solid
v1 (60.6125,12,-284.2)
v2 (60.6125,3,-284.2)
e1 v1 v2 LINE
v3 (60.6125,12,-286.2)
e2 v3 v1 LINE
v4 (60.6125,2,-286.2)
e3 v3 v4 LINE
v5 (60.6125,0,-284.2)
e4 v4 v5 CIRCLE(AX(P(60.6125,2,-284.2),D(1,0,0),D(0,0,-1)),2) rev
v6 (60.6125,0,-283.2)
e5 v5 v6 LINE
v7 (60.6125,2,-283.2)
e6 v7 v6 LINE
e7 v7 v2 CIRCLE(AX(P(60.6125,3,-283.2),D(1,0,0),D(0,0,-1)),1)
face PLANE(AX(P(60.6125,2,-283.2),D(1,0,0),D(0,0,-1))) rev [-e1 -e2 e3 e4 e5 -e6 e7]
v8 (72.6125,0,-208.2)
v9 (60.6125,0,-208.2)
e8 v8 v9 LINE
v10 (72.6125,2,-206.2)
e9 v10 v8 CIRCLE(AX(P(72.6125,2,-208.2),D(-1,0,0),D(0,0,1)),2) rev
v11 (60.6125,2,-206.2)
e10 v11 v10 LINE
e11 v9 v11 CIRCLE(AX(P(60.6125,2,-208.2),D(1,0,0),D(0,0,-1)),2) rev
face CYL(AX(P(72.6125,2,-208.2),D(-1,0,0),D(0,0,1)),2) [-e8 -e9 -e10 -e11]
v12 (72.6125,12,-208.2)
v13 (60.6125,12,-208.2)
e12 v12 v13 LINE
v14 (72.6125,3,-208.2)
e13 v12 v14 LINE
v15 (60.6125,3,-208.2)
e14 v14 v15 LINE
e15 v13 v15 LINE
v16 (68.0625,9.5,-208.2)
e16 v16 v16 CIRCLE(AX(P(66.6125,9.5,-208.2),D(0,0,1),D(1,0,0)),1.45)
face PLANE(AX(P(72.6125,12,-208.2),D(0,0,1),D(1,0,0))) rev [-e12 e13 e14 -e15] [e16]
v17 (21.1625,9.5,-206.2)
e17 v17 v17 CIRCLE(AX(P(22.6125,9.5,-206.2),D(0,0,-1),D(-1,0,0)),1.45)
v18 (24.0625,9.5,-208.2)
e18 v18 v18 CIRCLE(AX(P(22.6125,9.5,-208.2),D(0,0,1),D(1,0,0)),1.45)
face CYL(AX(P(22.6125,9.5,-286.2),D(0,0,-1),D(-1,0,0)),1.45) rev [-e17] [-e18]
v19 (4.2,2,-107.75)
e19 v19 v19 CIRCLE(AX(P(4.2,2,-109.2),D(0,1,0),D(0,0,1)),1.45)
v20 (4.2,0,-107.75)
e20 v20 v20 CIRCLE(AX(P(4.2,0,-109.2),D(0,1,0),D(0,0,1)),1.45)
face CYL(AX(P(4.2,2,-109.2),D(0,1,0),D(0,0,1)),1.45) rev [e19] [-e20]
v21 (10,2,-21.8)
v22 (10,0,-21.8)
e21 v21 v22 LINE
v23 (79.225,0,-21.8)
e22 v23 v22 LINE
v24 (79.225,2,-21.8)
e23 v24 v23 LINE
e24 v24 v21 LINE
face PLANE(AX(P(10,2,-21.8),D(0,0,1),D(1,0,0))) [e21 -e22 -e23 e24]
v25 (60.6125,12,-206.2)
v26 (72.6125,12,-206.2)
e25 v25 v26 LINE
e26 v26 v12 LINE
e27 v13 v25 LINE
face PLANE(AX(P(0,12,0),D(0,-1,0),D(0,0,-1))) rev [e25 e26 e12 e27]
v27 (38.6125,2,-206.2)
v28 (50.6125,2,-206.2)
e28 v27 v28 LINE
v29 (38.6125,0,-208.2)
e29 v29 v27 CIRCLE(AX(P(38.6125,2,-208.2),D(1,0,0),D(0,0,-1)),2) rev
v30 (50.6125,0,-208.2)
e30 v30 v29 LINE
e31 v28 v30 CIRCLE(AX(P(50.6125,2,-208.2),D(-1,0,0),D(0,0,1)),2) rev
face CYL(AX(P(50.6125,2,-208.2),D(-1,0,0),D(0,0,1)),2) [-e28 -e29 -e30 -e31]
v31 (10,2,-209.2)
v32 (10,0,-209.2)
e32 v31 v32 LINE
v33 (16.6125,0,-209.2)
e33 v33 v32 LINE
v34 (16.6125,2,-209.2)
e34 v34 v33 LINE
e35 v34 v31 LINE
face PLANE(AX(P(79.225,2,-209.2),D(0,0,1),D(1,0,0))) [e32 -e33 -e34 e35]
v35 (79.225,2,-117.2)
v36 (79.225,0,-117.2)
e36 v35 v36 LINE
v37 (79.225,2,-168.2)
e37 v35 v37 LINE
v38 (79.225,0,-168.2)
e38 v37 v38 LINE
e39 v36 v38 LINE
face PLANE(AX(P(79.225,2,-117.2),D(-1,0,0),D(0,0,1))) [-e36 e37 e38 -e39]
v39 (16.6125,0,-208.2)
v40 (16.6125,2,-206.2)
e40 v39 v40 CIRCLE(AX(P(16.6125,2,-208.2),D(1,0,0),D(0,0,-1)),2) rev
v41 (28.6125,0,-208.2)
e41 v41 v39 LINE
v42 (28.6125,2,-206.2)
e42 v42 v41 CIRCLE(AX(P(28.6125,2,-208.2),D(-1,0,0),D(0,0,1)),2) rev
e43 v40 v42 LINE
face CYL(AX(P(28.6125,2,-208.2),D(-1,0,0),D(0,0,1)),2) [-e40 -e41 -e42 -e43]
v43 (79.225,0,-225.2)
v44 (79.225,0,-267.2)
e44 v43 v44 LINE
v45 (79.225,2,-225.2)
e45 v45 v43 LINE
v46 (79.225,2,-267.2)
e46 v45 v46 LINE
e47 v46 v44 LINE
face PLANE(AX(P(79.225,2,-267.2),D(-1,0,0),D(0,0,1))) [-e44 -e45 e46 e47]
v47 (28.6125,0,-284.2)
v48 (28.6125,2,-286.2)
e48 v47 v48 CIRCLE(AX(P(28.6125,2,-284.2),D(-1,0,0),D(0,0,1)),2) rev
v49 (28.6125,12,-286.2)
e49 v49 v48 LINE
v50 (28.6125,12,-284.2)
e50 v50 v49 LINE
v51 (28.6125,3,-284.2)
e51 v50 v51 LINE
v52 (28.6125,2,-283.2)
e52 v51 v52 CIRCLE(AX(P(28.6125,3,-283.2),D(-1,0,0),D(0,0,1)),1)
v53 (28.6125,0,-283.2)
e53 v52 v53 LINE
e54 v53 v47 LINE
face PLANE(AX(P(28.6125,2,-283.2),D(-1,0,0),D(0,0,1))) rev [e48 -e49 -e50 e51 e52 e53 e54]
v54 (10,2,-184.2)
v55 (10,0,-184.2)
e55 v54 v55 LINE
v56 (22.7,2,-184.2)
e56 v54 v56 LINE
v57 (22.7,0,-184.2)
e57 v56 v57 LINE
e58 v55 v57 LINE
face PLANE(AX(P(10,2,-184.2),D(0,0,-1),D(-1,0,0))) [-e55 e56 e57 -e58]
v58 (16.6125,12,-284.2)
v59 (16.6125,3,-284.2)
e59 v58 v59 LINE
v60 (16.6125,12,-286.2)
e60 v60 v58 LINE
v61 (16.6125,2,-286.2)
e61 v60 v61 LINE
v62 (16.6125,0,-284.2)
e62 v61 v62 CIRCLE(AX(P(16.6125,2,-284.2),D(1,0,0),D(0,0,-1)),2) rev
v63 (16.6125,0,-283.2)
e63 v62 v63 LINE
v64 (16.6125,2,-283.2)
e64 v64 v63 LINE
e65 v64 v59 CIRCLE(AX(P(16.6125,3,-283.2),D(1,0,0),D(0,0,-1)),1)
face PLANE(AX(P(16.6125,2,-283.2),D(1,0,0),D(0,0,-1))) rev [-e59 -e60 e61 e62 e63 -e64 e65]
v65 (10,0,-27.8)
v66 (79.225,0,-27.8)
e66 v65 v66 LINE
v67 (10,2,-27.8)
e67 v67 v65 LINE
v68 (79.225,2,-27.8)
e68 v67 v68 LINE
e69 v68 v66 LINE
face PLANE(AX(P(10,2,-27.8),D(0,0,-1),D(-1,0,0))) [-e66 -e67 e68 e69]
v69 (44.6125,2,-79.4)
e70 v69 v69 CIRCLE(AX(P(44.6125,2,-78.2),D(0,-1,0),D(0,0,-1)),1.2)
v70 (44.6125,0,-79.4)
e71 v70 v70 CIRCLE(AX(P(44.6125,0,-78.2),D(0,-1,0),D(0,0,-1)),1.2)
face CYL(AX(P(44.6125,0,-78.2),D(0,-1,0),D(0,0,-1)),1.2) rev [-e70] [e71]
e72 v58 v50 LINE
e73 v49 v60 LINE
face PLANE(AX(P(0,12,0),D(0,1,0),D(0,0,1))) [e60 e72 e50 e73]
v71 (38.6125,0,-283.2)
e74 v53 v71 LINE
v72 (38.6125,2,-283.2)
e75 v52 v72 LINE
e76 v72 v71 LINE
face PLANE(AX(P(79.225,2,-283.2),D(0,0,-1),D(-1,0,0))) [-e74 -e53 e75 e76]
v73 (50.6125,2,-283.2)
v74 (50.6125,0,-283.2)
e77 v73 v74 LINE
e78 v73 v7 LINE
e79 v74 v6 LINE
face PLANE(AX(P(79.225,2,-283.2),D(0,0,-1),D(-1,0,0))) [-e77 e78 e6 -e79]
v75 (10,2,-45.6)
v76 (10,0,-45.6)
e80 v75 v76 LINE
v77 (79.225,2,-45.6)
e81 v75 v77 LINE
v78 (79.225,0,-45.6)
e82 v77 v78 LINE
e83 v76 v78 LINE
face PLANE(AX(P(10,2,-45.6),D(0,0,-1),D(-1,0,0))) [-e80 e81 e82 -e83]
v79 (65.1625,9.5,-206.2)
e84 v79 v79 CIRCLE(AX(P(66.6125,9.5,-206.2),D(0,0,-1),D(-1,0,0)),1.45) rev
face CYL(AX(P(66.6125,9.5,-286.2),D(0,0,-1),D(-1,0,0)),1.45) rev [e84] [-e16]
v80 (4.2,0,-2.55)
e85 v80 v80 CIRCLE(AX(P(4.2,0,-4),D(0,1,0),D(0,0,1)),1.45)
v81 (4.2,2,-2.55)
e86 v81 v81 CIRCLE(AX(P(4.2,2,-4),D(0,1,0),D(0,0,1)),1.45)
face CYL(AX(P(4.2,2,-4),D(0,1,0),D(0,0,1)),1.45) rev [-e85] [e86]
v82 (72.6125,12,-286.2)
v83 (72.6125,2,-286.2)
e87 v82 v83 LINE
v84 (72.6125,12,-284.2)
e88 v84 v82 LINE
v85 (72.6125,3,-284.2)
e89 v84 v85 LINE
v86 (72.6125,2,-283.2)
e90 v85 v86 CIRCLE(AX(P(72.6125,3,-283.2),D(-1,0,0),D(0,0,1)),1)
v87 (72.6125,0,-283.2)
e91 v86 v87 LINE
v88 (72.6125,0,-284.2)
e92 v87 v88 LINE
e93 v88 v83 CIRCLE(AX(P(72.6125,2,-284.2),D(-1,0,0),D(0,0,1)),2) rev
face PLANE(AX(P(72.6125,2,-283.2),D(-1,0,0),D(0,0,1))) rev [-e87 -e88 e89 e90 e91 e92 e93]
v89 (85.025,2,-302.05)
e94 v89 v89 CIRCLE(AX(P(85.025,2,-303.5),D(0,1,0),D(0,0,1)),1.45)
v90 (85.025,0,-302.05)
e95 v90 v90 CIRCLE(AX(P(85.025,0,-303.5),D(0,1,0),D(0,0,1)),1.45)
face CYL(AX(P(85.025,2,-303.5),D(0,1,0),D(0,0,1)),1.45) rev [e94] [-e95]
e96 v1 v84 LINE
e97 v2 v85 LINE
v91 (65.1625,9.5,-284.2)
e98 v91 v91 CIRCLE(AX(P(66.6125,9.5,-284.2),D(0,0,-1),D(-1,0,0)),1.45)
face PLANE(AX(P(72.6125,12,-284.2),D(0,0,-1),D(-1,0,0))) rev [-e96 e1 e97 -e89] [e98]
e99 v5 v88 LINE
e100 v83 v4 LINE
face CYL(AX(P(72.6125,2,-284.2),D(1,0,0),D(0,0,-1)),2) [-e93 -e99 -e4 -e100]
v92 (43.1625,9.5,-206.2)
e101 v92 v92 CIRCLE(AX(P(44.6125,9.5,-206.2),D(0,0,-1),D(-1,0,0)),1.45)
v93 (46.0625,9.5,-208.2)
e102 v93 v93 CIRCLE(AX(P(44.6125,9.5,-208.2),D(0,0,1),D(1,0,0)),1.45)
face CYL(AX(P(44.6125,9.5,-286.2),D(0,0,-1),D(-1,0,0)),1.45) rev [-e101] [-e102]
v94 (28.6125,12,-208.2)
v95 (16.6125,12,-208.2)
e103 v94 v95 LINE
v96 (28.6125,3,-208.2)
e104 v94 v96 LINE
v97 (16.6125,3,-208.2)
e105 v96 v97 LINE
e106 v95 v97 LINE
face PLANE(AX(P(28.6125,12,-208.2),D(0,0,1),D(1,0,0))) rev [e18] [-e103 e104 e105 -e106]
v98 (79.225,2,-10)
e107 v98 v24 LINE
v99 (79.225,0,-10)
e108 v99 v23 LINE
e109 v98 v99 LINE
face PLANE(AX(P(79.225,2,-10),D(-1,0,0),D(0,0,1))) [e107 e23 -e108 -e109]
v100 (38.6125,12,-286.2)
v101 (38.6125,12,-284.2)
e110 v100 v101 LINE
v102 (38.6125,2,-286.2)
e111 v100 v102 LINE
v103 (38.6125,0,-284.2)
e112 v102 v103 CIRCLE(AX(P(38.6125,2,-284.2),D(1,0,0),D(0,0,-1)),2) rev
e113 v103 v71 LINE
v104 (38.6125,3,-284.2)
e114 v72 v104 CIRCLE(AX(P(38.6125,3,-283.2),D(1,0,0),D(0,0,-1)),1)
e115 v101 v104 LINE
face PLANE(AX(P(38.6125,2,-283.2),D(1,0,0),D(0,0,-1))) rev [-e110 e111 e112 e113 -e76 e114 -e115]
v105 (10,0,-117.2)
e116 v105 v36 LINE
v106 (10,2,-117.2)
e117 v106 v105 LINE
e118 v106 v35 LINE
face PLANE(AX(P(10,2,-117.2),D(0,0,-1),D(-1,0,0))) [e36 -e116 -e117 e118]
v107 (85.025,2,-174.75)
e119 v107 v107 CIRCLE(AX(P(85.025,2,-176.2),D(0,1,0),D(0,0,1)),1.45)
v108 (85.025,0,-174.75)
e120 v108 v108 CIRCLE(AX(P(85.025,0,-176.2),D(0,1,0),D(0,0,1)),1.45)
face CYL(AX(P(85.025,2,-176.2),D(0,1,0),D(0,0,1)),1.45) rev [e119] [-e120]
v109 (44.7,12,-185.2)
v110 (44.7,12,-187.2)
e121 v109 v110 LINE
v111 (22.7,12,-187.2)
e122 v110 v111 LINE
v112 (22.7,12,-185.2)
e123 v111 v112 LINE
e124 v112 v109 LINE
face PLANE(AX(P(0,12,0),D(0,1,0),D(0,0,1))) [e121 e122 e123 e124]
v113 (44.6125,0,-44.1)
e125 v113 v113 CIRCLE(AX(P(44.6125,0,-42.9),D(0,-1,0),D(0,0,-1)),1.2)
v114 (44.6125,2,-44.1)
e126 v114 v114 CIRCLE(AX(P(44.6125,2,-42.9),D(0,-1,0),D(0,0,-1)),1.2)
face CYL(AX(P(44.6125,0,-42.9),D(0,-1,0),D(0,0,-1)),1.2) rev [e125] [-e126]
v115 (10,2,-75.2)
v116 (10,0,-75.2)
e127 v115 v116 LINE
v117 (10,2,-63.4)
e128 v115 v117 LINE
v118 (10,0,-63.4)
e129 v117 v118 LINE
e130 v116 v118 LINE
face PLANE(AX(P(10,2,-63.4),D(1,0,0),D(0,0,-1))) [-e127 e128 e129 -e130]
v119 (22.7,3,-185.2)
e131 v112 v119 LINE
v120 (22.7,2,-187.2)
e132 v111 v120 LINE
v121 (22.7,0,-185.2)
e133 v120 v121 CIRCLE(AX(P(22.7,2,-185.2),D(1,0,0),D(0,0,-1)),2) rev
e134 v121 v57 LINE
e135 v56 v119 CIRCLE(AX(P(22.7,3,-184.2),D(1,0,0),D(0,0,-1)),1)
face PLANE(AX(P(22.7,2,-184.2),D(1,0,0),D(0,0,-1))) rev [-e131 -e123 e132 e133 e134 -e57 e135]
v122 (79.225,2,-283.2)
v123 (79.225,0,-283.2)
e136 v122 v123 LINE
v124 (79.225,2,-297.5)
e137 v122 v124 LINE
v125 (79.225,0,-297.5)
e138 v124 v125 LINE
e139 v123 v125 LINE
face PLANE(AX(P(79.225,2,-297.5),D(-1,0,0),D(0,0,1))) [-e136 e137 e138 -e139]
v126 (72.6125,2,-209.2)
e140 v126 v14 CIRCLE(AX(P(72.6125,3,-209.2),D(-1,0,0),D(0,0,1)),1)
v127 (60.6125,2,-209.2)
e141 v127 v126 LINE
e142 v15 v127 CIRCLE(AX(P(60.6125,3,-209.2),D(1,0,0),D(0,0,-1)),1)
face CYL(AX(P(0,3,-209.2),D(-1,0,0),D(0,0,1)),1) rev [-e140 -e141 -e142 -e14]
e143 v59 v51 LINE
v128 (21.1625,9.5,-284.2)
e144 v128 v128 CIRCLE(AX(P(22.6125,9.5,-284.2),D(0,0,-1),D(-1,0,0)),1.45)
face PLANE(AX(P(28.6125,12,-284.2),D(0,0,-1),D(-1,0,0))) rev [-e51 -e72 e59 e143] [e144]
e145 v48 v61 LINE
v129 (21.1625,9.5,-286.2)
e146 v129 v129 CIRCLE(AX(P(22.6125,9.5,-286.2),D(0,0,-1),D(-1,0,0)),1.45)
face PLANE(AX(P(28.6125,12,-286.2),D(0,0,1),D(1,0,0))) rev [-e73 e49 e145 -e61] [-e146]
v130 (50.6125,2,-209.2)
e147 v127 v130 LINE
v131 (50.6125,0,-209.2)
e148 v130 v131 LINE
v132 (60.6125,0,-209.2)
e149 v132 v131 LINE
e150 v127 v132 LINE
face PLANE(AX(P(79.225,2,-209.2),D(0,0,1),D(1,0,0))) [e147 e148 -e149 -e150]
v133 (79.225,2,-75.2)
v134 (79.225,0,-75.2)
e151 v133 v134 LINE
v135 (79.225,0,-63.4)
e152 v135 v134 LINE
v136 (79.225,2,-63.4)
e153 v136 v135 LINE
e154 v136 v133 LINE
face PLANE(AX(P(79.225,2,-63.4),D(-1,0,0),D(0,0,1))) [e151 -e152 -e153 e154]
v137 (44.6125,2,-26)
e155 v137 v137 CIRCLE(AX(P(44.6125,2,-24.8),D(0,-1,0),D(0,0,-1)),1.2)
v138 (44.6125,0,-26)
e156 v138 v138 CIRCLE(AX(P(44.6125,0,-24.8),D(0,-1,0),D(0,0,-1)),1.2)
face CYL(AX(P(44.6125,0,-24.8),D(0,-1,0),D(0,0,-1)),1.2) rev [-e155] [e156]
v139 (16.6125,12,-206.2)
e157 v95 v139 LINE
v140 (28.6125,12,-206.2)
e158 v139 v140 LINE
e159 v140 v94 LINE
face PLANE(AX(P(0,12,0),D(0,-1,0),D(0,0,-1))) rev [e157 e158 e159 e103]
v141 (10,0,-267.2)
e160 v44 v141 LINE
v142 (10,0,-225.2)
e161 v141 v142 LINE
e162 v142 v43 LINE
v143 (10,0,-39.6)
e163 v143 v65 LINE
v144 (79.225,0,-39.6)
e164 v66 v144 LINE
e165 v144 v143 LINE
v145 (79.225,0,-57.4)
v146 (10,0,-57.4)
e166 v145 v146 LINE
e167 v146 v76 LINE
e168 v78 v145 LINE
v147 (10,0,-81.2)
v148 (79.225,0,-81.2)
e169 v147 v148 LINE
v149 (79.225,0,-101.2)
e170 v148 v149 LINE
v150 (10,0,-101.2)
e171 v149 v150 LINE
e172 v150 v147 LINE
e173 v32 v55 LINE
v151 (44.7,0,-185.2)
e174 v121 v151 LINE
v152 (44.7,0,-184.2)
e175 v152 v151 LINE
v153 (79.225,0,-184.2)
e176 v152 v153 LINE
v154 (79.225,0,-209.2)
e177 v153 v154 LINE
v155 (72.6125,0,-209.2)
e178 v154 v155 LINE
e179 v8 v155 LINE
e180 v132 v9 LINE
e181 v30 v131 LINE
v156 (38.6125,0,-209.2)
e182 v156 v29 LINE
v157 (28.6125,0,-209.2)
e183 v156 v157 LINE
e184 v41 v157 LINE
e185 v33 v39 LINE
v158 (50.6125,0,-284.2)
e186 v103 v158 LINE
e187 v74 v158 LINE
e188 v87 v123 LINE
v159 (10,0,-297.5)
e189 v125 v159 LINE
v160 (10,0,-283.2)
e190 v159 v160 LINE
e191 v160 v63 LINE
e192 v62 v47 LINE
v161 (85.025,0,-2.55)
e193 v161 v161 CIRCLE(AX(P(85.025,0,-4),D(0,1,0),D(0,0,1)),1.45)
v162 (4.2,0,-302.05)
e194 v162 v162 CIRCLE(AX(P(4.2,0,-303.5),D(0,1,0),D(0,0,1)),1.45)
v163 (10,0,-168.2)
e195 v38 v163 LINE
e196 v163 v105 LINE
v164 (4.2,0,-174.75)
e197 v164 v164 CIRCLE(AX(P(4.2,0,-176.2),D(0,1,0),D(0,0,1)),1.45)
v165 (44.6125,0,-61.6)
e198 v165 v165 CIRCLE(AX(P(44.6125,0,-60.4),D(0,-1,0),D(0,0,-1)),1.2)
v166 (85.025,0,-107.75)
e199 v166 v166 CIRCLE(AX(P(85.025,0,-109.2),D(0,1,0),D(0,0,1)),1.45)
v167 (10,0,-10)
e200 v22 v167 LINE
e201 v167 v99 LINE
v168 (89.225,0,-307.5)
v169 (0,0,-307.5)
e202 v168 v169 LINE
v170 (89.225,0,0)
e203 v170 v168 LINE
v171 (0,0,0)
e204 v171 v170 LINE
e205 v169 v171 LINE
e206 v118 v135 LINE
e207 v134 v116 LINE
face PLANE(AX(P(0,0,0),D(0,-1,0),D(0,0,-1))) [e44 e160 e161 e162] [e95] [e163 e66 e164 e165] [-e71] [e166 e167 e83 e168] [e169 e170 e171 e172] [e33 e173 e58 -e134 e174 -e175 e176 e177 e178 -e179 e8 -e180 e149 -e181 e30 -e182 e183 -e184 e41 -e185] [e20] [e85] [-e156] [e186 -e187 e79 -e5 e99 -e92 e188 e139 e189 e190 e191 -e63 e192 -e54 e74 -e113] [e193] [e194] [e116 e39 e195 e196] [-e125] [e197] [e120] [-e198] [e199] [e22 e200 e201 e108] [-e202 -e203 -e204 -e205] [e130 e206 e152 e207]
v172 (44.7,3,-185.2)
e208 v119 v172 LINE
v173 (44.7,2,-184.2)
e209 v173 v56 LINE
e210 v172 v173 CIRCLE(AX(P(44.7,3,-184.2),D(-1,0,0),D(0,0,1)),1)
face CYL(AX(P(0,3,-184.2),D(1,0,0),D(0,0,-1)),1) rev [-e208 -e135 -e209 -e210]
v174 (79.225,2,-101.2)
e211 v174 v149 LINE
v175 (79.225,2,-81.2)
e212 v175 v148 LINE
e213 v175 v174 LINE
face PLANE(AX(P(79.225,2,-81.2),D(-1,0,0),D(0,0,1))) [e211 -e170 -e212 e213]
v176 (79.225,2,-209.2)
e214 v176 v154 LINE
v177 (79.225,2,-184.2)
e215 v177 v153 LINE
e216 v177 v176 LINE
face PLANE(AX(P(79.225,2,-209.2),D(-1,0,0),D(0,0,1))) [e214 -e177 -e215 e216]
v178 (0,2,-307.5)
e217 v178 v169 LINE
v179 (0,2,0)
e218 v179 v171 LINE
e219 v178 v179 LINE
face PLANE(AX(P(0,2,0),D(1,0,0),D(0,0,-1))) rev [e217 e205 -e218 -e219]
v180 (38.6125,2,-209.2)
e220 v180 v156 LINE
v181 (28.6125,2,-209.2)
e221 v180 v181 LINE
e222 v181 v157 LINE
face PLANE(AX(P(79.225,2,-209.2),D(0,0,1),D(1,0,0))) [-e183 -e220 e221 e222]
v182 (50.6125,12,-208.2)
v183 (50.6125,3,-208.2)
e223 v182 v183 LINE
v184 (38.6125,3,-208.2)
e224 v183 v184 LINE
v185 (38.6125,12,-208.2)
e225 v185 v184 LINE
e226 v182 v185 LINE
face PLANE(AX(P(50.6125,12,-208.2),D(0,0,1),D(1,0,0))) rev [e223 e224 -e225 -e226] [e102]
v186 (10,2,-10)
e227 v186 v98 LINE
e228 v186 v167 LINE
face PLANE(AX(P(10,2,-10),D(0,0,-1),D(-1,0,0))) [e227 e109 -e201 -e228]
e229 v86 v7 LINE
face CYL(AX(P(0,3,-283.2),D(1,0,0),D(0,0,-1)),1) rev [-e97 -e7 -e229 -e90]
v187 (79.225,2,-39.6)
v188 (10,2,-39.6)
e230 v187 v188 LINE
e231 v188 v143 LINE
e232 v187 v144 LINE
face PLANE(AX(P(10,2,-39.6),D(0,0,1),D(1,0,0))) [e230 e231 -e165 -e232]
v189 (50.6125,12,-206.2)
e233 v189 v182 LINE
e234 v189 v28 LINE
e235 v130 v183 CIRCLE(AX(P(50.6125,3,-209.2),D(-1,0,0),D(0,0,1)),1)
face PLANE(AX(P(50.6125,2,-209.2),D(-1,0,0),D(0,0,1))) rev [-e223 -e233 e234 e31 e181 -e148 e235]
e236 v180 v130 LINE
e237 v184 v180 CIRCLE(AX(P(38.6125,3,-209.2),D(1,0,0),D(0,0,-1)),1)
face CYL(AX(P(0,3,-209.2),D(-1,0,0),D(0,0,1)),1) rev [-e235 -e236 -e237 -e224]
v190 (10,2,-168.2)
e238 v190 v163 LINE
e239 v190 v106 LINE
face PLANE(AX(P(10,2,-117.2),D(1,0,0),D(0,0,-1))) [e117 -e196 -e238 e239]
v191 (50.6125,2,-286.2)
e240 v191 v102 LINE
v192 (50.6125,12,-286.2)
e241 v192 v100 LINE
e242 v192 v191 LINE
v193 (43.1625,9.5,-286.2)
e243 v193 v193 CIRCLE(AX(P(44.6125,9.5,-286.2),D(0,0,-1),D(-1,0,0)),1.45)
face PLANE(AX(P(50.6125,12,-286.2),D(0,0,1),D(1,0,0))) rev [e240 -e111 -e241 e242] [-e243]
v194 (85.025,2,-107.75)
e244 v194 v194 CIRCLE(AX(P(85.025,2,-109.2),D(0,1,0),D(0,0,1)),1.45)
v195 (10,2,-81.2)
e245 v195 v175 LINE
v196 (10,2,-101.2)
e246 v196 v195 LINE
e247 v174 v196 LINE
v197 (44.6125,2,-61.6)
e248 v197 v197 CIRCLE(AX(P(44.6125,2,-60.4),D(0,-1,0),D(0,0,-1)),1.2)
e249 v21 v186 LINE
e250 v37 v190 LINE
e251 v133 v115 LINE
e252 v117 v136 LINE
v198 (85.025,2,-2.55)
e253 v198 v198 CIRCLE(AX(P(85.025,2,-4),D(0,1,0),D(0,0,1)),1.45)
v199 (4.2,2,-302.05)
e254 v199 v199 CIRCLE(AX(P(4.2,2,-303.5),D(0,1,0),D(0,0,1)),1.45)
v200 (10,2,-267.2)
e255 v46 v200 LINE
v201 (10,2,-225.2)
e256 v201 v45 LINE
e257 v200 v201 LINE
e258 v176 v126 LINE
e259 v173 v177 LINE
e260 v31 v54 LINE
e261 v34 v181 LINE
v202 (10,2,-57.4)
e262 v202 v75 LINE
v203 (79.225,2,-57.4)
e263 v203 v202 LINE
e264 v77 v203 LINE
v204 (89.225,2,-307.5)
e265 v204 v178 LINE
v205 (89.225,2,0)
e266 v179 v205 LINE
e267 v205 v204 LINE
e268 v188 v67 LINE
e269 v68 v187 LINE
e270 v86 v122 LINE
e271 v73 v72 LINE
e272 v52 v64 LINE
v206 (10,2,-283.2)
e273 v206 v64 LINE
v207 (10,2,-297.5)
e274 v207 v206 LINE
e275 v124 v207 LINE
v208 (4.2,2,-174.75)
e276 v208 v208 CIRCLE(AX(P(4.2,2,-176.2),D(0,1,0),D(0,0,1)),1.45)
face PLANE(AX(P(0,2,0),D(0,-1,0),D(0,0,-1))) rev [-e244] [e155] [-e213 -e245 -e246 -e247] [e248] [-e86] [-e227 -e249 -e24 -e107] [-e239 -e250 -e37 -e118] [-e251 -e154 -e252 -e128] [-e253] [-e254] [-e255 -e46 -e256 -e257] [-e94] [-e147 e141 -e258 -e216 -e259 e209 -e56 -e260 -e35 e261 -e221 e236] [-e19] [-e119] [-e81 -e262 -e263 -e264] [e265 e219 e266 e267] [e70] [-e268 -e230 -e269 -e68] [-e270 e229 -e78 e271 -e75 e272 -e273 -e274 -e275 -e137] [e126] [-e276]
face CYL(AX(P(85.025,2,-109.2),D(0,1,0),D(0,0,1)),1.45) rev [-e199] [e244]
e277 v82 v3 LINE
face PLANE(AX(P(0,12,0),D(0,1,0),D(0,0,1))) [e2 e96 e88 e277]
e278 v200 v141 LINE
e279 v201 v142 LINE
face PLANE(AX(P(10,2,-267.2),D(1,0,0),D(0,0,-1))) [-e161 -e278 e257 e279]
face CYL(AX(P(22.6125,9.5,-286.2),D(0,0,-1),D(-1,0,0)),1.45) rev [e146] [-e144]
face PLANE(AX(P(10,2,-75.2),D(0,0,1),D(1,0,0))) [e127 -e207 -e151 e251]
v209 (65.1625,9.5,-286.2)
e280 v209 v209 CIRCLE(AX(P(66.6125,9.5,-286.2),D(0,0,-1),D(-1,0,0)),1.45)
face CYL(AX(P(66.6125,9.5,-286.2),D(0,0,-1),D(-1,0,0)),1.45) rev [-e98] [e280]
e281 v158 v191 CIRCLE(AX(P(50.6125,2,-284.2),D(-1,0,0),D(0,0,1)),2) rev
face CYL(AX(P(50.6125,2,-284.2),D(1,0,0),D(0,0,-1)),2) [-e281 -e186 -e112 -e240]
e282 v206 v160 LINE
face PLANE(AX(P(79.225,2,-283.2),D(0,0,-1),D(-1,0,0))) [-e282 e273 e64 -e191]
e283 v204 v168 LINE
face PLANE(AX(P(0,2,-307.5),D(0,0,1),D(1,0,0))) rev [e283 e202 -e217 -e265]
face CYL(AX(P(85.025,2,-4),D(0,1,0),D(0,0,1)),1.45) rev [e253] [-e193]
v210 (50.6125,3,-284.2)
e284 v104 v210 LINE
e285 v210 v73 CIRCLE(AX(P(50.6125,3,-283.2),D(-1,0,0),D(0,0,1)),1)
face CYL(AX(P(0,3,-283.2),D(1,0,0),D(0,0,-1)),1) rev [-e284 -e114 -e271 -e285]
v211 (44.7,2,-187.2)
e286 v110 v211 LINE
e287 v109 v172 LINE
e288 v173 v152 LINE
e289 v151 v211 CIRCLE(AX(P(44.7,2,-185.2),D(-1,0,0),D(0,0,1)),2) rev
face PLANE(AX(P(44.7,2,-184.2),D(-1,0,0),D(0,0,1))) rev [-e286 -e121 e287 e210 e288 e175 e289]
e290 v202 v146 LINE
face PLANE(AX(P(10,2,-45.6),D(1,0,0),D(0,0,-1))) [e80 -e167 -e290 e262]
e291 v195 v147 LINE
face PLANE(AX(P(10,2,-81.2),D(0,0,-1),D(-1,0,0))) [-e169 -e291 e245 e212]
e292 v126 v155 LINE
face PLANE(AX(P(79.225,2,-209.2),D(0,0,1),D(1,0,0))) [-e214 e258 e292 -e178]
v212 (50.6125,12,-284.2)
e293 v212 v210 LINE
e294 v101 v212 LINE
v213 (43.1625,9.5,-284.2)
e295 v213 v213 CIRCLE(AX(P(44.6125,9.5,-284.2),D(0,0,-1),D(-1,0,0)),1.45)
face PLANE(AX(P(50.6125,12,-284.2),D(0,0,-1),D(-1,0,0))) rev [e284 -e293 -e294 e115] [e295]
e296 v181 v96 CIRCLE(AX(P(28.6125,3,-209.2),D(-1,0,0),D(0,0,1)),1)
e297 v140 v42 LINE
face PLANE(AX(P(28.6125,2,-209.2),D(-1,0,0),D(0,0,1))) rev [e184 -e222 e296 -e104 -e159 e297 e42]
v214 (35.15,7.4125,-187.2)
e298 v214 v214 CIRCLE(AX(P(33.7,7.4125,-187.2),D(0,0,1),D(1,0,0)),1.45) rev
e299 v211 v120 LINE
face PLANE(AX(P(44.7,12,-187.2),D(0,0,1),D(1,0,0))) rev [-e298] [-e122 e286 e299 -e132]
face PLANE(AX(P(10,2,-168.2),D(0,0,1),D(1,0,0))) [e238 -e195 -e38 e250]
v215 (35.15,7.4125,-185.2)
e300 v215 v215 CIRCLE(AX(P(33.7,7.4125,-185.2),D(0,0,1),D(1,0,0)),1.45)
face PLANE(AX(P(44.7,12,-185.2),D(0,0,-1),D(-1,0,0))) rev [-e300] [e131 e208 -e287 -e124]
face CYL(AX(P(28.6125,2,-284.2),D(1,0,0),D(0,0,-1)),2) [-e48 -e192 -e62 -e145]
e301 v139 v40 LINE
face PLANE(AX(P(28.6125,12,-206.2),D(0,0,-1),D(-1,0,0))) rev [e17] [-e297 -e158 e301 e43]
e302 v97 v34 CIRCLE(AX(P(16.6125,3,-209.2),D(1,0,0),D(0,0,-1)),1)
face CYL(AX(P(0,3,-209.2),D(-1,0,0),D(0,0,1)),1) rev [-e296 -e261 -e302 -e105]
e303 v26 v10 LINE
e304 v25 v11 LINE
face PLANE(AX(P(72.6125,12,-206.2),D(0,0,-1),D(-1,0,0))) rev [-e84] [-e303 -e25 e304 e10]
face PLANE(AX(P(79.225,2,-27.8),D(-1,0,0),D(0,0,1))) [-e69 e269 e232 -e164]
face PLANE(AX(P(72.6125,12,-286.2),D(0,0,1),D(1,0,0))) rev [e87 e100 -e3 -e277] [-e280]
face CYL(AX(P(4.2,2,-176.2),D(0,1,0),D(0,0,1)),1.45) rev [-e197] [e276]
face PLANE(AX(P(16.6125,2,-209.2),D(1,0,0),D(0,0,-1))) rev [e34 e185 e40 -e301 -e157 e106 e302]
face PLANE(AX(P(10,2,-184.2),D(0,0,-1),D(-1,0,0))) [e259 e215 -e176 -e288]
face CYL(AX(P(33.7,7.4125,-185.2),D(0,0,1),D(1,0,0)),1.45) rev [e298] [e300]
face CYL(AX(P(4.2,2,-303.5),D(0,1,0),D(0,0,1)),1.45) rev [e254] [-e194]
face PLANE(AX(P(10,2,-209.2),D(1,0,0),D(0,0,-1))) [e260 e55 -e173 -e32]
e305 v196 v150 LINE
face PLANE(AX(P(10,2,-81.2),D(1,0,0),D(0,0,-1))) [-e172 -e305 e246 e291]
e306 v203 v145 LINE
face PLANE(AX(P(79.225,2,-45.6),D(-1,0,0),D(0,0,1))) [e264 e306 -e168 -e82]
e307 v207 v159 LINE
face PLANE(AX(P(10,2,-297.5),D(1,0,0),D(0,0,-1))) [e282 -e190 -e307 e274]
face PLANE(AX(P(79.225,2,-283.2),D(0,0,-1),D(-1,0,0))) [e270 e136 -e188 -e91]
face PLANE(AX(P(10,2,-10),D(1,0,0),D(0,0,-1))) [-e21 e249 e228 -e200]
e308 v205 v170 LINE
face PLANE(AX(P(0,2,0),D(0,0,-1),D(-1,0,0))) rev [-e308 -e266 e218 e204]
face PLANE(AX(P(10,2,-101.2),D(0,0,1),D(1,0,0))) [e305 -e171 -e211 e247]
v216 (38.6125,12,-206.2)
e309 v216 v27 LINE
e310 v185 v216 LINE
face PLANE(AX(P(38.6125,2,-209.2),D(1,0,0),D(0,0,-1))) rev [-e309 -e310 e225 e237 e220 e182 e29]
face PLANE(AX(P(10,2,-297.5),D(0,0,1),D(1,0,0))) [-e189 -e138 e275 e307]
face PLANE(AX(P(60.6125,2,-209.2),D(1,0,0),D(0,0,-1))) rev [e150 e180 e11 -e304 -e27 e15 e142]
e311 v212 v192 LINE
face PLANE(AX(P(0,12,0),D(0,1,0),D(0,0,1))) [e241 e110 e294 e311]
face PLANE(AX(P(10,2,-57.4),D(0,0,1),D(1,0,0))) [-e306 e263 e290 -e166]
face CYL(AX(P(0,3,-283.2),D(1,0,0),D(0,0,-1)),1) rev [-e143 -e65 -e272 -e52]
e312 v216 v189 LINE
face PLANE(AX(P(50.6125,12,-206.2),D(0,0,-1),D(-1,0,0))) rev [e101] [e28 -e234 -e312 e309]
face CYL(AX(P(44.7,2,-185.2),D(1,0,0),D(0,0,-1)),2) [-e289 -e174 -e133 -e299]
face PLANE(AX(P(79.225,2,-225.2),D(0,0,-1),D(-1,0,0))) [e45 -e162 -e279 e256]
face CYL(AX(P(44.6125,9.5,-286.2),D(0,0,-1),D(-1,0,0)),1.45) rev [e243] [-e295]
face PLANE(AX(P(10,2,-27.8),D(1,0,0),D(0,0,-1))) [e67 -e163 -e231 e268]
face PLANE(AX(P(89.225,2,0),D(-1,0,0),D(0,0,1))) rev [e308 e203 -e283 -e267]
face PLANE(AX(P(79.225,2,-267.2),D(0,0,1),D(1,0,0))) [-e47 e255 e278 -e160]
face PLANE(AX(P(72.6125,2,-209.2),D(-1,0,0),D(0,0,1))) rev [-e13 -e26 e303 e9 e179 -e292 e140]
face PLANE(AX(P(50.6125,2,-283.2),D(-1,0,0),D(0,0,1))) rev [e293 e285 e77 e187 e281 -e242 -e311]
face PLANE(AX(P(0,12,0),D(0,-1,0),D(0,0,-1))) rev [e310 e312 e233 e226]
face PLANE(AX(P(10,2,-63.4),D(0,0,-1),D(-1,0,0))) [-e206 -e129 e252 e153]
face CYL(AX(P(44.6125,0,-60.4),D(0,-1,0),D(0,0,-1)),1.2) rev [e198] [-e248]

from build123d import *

# Parameters (mm, degrees)
SKETCH1_W                      = 89.225
SKETCH1_H                      = 307.5
SKETCH1_W_2                    = 69.225
SKETCH1_H_2                    = 42
SKETCH1_H_3                    = 20
SKETCH1_H_4                    = 51
SKETCH1_H_5                    = 14.3
SKETCH1_H_6                    = 25
BOSS_EXTRUDE1_DEPTH            = 2
SKETCH20_W                     = 22
SKETCH20_H                     = 1
BOSS_EXTRUDE7_DEPTH            = 2
SKETCH21_W                     = 22
SKETCH21_H                     = 2
BOSS_EXTRUDE8_DEPTH            = 12
FILLET7_R                      = 2
FILLET8_R                      = 1
M2_5_CLEARANCE_HOLE3_D         = 2.9
SKETCH28_W                     = 12
SKETCH28_H                     = 1
BOSS_EXTRUDE11_DEPTH           = 2
SKETCH29_W                     = 12
SKETCH29_H                     = 2
BOSS_EXTRUDE12_DEPTH           = 12
FILLET11_R                     = 2
FILLET12_R                     = 1
M2_5_START                     = -286.2
M2_5_CLEARANCE_HOLE5_OUTLINE_R = 1.45
M2_5_CLEARANCE_HOLE5_DEPTH     = 80
M2_5_CLEARANCE_HOLE6_D         = 2.9
M2_CLEARANCE_HOLE1_D           = 2.4


# Read off the part's stored shape, not the designer's step: M2.5 Clearance Hole5
with BuildPart() as part:
    # Sketch1 → Boss-Extrude1 (new body)
    with BuildSketch(Plane(origin=(0, 0, 0), x_dir=(1, 0, 0), z_dir=(0, 1, 0))):
        with Locations((44.6125, 153.75)):
            Rectangle(SKETCH1_W, SKETCH1_H)
        with Locations((44.6125, 246.2)):
            Rectangle(SKETCH1_W_2, SKETCH1_H_2, mode=Mode.SUBTRACT)
        Polygon((10, 10), (79.225, 10), (79.225, 21.8), (56.6125, 21.8), (32.6125, 21.8), (10, 21.8), align=None, mode=Mode.SUBTRACT)
        Polygon((10, 27.8), (79.225, 27.8), (79.225, 39.6), (56.6125, 39.6), (32.6125, 39.6), (10, 39.6), align=None, mode=Mode.SUBTRACT)
        Polygon((10, 45.6), (79.225, 45.6), (79.225, 57.4), (56.6125, 57.4), (32.6125, 57.4), (10, 57.4), align=None, mode=Mode.SUBTRACT)
        Polygon((10, 63.4), (79.225, 63.4), (79.225, 75.2), (56.6125, 75.2), (32.6125, 75.2), (10, 75.2), align=None, mode=Mode.SUBTRACT)
        with Locations((44.6125, 91.2)):
            Rectangle(SKETCH1_W_2, SKETCH1_H_3, mode=Mode.SUBTRACT)
        with Locations((44.6125, 142.7)):
            Rectangle(SKETCH1_W_2, SKETCH1_H_4, mode=Mode.SUBTRACT)
        with Locations((44.6125, 290.35)):
            Rectangle(SKETCH1_W_2, SKETCH1_H_5, mode=Mode.SUBTRACT)
        with Locations((44.6125, 196.7)):
            Rectangle(SKETCH1_W_2, SKETCH1_H_6, mode=Mode.SUBTRACT)
    extrude(amount=BOSS_EXTRUDE1_DEPTH)

    # Sketch20 → Boss-Extrude7 (add)
    with BuildSketch(Plane(origin=(0, 0, 0), x_dir=(1, 0, 0), z_dir=(0, 1, 0))):
        with Locations((33.7, 184.7)):
            Rectangle(SKETCH20_W, SKETCH20_H)
    extrude(amount=BOSS_EXTRUDE7_DEPTH)

    # Sketch21 → Boss-Extrude8 (add)
    with BuildSketch(Plane(origin=(0, 0, 0), x_dir=(1, 0, 0), z_dir=(0, 1, 0))):
        with Locations((33.7, 186.2)):
            Rectangle(SKETCH21_W, SKETCH21_H)
    extrude(amount=BOSS_EXTRUDE8_DEPTH)

    # Fillet7
    fillet7_edges = [part.edges().sort_by_distance(p)[0] for p in [
        (33.7, 0, -187.2),
    ]]
    fillet(fillet7_edges, radius=FILLET7_R)

    # Fillet8
    fillet8_edges = [part.edges().sort_by_distance(p)[0] for p in [
        (33.7, 2, -185.2),
    ]]
    fillet(fillet8_edges, radius=FILLET8_R)

    # M2.5 Clearance Hole3 (through all)
    with Locations(Plane.XY.offset(-185.2)):
        with Locations((33.7, 7.4125)):
            Hole(M2_5_CLEARANCE_HOLE3_D / 2)

    # Sketch28 → Boss-Extrude11 (add)
    with BuildSketch(Plane(origin=(0, 0, 0), x_dir=(1, 0, 0), z_dir=(0, 1, 0))):
        with Locations((66.6125, 208.7)):
            Rectangle(SKETCH28_W, SKETCH28_H)
        with Locations((44.6125, 208.7)):
            Rectangle(SKETCH28_W, SKETCH28_H)
        with Locations((22.6125, 208.7)):
            Rectangle(SKETCH28_W, SKETCH28_H)
        with Locations((66.6125, 283.7)):
            Rectangle(SKETCH28_W, SKETCH28_H)
        with Locations((44.6125, 283.7)):
            Rectangle(SKETCH28_W, SKETCH28_H)
        with Locations((22.6125, 283.7)):
            Rectangle(SKETCH28_W, SKETCH28_H)
    extrude(amount=BOSS_EXTRUDE11_DEPTH)

    # Sketch29 → Boss-Extrude12 (add)
    with BuildSketch(Plane(origin=(0, 0, 0), x_dir=(1, 0, 0), z_dir=(0, 1, 0))):
        with Locations((66.6125, 207.2)):
            Rectangle(SKETCH29_W, SKETCH29_H)
        with Locations((44.6125, 207.2)):
            Rectangle(SKETCH29_W, SKETCH29_H)
        with Locations((22.6125, 207.2)):
            Rectangle(SKETCH29_W, SKETCH29_H)
        with Locations((66.6125, 285.2)):
            Rectangle(SKETCH29_W, SKETCH29_H)
        with Locations((44.6125, 285.2)):
            Rectangle(SKETCH29_W, SKETCH29_H)
        with Locations((22.6125, 285.2)):
            Rectangle(SKETCH29_W, SKETCH29_H)
    extrude(amount=BOSS_EXTRUDE12_DEPTH)

    # Fillet11
    fillet11_edges = [part.edges().sort_by_distance(p)[0] for p in [
        (66.6125, 0, -206.2),
        (44.6125, 0, -206.2),
        (22.6125, 0, -206.2),
        (66.6125, 0, -286.2),
        (44.6125, 0, -286.2),
        (22.6125, 0, -286.2),
    ]]
    fillet(fillet11_edges, radius=FILLET11_R)

    # Fillet12
    fillet12_edges = [part.edges().sort_by_distance(p)[0] for p in [
        (22.6125, 2, -284.2),
        (44.6125, 2, -284.2),
        (66.6125, 2, -284.2),
        (66.6125, 2, -208.2),
        (44.6125, 2, -208.2),
        (22.6125, 2, -208.2),
    ]]
    fillet(fillet12_edges, radius=FILLET12_R)

    # M2.5 Clearance Hole5 outline → M2.5 Clearance Hole5 (cut)
    with BuildSketch(Plane.XY.offset(M2_5_START)):
        with Locations((22.6125, 9.5)):
            Circle(M2_5_CLEARANCE_HOLE5_OUTLINE_R)
        with Locations((44.6125, 9.5)):
            Circle(M2_5_CLEARANCE_HOLE5_OUTLINE_R)
        with Locations((66.6125, 9.5)):
            Circle(M2_5_CLEARANCE_HOLE5_OUTLINE_R)
    extrude(amount=M2_5_CLEARANCE_HOLE5_DEPTH, mode=Mode.SUBTRACT)

    # M2.5 Clearance Hole6 (through all)
    with Locations(Plane(origin=(0, 2, 0), x_dir=(1, 0, 0), z_dir=(0, 1, 0))):
        with Locations((85.025, 4), (4.2, 4), (4.2, 109.2), (4.2, 176.2), (4.2, 303.5), (85.025, 303.5), (85.025, 176.2), (85.025, 109.2)):
            Hole(M2_5_CLEARANCE_HOLE6_D / 2)

    # M2 Clearance Hole1 (through all)
    with Locations(Plane(origin=(0, 0, 0), x_dir=(-1, 0, 0), z_dir=(0, -1, 0))):
        with Locations((-44.6125, 24.8), (-44.6125, 42.9), (-44.6125, 60.4), (-44.6125, 78.2)):
            Hole(M2_CLEARANCE_HOLE1_D / 2)


solid = part.part
